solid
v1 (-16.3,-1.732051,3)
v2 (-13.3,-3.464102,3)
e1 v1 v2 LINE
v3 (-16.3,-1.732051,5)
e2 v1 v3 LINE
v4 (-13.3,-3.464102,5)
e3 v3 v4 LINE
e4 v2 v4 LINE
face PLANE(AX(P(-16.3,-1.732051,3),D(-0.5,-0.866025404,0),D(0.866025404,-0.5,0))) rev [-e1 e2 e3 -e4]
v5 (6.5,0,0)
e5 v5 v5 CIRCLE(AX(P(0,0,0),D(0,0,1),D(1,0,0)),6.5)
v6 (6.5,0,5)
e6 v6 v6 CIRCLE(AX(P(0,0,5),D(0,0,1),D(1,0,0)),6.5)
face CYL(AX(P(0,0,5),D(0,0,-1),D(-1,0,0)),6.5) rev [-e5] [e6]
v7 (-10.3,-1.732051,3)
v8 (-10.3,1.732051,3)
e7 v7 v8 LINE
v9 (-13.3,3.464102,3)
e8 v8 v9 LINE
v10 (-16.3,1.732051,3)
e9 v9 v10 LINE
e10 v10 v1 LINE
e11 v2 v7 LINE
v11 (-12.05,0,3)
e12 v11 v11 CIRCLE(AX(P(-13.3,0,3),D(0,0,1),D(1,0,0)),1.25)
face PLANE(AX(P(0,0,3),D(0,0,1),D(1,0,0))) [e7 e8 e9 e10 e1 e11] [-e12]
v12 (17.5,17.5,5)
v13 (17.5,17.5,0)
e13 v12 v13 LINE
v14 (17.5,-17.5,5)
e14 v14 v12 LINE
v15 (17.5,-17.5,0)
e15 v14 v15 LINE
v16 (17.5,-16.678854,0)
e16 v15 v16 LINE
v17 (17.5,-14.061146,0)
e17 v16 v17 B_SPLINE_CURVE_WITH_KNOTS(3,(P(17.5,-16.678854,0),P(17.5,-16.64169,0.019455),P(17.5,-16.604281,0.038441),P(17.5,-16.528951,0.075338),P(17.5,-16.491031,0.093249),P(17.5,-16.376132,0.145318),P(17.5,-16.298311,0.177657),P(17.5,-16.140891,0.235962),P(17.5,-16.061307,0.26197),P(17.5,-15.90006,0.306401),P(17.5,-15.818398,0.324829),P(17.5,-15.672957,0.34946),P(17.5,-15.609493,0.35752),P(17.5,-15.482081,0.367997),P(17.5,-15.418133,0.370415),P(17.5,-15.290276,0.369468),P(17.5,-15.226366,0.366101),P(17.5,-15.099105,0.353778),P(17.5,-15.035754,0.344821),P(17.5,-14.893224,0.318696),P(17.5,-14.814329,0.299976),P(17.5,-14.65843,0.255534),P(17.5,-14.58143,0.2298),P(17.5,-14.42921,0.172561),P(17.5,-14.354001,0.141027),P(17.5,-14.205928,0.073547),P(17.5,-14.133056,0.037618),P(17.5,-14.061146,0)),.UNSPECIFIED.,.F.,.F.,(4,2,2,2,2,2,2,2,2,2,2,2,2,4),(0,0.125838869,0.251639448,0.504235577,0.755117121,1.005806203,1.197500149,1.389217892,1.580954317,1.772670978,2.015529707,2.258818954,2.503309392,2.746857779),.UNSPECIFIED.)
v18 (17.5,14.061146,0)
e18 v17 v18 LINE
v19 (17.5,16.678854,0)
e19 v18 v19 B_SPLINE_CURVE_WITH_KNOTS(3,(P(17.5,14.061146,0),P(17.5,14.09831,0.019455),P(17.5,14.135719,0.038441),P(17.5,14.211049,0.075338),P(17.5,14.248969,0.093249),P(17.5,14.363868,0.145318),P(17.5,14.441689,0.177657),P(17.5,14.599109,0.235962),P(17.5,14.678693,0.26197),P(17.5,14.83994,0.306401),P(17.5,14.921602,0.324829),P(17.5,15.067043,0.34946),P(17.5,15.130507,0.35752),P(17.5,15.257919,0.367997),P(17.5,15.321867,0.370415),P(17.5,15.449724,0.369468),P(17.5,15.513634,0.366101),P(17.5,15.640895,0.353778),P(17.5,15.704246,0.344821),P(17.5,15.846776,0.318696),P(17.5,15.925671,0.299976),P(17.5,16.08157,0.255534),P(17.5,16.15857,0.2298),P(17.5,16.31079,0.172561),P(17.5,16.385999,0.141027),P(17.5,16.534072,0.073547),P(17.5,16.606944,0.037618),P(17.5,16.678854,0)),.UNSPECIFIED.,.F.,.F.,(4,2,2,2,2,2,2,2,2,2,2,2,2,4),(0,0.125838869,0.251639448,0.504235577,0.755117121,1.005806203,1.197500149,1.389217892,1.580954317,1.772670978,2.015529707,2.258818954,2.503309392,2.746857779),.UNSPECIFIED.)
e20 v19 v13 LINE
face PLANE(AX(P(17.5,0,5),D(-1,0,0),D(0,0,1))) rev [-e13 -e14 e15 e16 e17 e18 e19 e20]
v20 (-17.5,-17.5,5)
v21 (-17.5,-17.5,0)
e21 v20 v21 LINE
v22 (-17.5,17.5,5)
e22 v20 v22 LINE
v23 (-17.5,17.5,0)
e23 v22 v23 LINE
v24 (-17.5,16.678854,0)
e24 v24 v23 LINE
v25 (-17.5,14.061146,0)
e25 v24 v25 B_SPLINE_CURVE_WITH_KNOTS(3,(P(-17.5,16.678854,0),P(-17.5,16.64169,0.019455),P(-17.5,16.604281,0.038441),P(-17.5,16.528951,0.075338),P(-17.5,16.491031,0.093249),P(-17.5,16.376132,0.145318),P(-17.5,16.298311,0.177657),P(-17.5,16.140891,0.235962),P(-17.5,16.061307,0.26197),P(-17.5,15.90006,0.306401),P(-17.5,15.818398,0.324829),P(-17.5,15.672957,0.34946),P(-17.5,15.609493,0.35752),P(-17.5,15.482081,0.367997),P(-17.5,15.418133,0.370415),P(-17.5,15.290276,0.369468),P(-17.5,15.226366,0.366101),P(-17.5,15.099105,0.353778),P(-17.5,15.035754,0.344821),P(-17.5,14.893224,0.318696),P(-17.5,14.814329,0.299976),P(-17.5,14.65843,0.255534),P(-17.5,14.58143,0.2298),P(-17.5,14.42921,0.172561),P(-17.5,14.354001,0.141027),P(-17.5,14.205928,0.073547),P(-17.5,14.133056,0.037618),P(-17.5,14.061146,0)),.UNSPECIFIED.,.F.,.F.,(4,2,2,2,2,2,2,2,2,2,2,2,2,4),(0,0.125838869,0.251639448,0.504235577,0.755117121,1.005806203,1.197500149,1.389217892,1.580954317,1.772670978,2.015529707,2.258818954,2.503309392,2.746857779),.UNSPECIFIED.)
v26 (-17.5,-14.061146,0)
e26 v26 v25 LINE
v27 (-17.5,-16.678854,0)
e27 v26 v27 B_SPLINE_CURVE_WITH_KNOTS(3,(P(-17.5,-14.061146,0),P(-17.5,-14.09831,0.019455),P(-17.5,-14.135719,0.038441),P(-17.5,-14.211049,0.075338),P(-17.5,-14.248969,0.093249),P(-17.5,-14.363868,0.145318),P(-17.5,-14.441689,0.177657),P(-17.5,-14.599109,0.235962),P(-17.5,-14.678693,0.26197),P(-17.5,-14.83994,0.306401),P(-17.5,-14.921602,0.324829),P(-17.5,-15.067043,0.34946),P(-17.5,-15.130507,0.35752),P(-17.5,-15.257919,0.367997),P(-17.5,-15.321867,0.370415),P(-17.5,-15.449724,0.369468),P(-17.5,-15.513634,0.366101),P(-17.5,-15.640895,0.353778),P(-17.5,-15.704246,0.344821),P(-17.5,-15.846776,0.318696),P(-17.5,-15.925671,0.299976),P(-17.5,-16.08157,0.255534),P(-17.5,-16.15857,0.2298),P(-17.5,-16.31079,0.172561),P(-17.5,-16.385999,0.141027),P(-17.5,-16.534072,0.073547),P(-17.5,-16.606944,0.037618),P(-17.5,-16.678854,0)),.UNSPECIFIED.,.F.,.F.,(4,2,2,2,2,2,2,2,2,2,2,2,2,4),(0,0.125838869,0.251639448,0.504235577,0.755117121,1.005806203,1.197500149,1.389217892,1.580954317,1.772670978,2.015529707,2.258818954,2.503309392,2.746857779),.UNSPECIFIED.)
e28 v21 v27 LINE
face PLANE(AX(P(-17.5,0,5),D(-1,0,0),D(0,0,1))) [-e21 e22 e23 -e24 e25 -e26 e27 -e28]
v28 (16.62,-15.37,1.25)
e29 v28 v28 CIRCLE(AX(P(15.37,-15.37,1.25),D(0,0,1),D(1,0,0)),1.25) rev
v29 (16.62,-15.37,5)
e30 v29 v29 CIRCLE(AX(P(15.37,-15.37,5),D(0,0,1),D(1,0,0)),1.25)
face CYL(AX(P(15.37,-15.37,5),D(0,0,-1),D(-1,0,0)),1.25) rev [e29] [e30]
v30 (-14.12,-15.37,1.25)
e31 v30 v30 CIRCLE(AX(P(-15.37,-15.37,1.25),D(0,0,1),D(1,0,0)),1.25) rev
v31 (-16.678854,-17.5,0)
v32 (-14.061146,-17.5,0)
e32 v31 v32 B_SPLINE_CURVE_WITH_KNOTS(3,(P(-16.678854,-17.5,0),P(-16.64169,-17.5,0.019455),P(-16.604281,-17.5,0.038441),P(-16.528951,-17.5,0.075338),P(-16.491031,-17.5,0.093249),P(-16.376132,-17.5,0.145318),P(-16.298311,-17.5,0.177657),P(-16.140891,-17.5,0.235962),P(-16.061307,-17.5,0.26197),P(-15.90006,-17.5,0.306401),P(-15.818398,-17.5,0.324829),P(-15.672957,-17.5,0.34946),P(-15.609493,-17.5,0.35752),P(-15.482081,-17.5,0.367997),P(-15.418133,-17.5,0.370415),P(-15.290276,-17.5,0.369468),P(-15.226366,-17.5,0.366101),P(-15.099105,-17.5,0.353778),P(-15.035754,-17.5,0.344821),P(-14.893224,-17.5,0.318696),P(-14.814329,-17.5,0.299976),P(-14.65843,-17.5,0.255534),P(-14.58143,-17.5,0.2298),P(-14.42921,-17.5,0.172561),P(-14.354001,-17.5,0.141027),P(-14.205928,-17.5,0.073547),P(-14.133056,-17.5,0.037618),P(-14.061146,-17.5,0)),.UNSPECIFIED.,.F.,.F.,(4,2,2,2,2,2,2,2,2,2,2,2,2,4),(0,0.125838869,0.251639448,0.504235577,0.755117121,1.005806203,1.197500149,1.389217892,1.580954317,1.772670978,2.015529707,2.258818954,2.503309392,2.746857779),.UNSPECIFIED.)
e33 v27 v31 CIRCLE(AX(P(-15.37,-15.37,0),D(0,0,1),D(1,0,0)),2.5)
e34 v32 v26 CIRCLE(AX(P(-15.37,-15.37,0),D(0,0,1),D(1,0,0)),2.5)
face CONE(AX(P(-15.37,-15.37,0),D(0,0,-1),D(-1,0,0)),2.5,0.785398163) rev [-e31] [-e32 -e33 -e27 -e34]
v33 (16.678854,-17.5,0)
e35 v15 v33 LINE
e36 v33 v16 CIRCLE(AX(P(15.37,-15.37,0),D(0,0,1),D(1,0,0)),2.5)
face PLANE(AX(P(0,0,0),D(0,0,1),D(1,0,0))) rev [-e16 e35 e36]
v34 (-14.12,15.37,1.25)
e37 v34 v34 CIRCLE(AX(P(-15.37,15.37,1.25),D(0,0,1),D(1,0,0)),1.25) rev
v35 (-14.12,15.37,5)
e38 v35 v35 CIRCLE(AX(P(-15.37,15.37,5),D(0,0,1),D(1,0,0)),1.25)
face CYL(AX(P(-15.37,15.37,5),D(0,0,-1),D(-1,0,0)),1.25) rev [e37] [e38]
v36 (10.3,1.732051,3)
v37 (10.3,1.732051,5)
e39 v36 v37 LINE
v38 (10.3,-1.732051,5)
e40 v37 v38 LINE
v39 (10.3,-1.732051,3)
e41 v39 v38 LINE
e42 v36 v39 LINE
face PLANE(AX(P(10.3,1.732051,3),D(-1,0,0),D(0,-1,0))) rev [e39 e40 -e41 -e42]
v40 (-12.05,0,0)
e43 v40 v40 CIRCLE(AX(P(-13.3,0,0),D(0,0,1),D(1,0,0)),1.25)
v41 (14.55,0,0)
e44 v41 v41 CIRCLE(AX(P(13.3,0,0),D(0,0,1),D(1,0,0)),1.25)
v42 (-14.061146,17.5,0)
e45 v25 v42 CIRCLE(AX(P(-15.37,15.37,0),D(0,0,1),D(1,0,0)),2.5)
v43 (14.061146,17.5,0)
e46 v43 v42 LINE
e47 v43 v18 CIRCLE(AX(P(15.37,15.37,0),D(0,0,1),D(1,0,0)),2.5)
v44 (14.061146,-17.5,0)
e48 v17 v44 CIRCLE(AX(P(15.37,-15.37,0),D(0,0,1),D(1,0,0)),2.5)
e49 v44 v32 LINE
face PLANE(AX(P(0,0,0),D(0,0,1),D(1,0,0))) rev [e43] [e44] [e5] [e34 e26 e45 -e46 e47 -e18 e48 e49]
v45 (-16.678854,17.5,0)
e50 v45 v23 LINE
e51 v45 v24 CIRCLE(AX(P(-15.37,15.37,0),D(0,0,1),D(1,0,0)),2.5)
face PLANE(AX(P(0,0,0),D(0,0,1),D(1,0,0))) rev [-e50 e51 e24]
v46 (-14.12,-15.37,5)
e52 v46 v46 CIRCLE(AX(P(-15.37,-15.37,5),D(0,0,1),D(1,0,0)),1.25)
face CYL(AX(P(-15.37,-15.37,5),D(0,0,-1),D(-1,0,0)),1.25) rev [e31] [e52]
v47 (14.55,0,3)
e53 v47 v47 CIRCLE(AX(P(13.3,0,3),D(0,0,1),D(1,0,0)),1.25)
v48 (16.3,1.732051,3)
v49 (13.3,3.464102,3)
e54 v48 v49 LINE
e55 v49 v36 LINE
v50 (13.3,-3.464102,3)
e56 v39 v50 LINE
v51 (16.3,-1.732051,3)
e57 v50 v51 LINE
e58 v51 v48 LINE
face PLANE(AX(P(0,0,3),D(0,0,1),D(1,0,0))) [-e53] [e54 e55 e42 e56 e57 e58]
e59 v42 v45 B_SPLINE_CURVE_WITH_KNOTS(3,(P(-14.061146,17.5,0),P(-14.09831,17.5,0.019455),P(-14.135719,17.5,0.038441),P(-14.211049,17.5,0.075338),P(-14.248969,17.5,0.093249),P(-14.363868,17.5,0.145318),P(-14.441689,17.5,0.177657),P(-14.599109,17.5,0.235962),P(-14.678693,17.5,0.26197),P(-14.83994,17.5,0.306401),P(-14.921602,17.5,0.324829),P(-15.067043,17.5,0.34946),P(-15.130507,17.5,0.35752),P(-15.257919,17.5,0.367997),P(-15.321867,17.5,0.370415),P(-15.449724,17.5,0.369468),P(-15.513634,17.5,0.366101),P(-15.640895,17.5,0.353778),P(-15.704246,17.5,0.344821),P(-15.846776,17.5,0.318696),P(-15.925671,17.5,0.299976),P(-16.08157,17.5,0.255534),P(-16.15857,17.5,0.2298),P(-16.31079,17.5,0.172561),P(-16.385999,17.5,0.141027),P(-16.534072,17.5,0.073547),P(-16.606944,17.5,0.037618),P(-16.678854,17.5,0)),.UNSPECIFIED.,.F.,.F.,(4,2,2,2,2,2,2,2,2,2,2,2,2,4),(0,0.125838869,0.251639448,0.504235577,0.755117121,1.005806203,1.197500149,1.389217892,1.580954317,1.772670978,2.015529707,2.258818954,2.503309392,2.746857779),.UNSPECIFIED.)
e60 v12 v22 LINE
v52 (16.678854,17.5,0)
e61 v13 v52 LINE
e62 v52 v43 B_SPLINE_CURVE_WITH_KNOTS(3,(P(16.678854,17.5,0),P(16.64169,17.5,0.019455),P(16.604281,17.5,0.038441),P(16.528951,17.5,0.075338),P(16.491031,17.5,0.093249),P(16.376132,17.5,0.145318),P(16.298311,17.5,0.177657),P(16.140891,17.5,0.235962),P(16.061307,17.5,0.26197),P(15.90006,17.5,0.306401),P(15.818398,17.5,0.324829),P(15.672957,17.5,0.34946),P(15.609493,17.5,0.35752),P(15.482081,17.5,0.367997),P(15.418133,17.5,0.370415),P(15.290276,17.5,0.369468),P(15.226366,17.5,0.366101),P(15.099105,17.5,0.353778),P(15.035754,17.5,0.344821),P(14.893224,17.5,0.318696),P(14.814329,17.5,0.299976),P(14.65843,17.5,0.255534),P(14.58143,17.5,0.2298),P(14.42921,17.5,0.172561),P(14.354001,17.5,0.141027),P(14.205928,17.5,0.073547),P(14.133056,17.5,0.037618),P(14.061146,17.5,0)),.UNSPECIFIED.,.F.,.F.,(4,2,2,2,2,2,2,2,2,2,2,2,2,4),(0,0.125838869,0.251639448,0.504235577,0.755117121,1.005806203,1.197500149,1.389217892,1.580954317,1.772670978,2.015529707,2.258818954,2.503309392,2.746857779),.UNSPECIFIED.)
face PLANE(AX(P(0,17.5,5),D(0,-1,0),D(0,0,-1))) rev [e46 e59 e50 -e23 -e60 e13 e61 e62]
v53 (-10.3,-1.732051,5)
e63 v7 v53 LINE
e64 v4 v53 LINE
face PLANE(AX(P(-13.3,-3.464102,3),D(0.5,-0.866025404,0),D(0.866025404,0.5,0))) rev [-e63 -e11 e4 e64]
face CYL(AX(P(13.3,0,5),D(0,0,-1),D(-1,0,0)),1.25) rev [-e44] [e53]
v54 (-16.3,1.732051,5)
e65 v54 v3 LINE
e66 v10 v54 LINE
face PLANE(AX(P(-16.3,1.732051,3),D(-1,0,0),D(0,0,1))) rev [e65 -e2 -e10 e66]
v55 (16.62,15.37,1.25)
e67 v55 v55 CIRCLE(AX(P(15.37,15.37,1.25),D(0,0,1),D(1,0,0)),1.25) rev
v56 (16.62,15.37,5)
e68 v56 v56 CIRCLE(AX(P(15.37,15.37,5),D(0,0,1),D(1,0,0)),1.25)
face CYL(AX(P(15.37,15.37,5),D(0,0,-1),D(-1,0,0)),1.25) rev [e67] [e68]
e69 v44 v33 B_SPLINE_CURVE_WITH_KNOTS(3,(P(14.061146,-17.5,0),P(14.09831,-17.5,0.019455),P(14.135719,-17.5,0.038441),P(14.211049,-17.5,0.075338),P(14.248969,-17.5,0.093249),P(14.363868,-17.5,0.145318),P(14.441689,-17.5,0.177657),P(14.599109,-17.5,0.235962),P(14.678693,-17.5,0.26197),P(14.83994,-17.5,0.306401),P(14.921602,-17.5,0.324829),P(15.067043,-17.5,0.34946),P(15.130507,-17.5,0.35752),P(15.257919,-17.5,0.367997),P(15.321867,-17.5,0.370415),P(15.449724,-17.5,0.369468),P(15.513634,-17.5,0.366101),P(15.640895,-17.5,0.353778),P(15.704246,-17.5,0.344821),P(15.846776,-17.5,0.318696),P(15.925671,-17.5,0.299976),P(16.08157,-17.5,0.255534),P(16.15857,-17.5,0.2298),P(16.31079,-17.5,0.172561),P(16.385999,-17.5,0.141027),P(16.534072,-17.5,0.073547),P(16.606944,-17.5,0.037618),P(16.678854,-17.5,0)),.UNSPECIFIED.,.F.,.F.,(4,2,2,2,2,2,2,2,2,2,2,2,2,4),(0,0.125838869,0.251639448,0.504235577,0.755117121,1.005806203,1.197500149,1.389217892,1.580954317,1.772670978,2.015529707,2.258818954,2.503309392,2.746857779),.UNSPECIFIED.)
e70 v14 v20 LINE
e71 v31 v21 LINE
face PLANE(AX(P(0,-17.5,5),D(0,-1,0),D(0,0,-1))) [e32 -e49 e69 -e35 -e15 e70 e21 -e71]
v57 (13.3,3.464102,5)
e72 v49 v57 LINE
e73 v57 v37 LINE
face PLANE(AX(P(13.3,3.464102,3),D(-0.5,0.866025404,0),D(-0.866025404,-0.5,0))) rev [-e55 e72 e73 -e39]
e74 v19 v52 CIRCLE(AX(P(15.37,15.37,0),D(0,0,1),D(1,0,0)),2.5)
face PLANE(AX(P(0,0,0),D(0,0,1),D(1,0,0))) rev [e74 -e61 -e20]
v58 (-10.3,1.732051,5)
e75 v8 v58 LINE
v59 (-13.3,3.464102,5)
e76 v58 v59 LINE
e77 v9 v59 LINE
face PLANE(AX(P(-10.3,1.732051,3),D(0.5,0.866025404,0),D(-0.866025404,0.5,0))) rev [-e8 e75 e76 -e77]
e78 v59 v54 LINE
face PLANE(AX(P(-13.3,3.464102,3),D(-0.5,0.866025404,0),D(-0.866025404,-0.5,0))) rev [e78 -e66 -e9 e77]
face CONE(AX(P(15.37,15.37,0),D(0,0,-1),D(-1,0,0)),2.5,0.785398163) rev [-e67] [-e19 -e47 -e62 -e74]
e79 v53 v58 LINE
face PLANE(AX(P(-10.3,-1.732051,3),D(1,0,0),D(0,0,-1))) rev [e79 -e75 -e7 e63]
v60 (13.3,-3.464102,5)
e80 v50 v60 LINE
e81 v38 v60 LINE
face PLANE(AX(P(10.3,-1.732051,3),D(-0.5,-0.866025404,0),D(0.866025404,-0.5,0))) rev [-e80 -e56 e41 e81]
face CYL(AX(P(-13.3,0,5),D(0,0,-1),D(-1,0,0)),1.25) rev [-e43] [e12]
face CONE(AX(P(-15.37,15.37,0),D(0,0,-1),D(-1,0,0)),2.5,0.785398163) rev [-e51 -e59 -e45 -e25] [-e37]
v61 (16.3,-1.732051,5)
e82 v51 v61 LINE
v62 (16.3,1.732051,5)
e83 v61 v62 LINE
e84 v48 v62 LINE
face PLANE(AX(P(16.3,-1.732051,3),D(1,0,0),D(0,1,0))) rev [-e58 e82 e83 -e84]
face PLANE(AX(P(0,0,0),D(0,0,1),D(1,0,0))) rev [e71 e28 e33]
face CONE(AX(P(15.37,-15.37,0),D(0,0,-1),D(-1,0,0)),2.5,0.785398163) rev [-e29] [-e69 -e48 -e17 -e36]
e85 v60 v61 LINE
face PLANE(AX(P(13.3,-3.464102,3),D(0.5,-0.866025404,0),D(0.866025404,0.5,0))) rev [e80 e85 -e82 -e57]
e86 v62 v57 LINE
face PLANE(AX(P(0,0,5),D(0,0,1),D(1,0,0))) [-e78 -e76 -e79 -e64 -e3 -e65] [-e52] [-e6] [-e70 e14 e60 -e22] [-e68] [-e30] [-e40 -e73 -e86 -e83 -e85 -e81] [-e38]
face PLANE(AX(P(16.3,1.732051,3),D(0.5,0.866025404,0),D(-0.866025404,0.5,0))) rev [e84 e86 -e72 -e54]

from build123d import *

# Parameters (mm, degrees)
CROQUIS1_W              = 35
CROQUIS1_H              = 35
CROQUIS1_R              = 1.25
CROQUIS1_R_2            = 6.5
SALIENTE_EXTRUIR1_DEPTH = 5
CORTAR_EXTRUIR1_DEPTH   = 2
CHAFL_N1_SIZE           = 1.25


with BuildPart() as part:
    # Croquis1 → Saliente-Extruir1 (new body)
    with BuildSketch(Plane.XY):
        Rectangle(CROQUIS1_W, CROQUIS1_H)
        with Locations((-15.37, 15.37)):
            Circle(CROQUIS1_R, mode=Mode.SUBTRACT)
        with Locations((15.37, 15.37)):
            Circle(CROQUIS1_R, mode=Mode.SUBTRACT)
        with Locations((15.37, -15.37)):
            Circle(CROQUIS1_R, mode=Mode.SUBTRACT)
        with Locations((-15.37, -15.37)):
            Circle(CROQUIS1_R, mode=Mode.SUBTRACT)
        Circle(CROQUIS1_R_2, mode=Mode.SUBTRACT)
        with Locations((13.3, 0)):
            Circle(CROQUIS1_R, mode=Mode.SUBTRACT)
        with Locations((-13.3, 0)):
            Circle(CROQUIS1_R, mode=Mode.SUBTRACT)
    extrude(amount=SALIENTE_EXTRUIR1_DEPTH)

    # Croquis2 → Cortar-Extruir1 (cut)
    with BuildSketch(Plane.XY.offset(5)):
        Polygon((-13.3, 3.464101615), (-16.3, 1.732050808), (-16.3, -1.732050808), (-13.3, -3.464101615), (-10.3, -1.732050808), (-10.3, 1.732050808), align=None)
        Polygon((13.3, 3.464101615), (10.3, 1.732050808), (10.3, -1.732050808), (13.3, -3.464101615), (16.3, -1.732050808), (16.3, 1.732050808), align=None)
    extrude(amount=-CORTAR_EXTRUIR1_DEPTH, mode=Mode.SUBTRACT)

    # Chaflán1
    # the kernel refuses this chamfer: 1.25 mm, written as the material it takes off along each edge
    with BuildSketch(Plane(origin=(-15.37, 15.37, 0), x_dir=(1, 0, 0), z_dir=(0, -1, 0))) as chafl_n1_piece_1:
        Polygon((1.25 + CHAFL_N1_SIZE, 0), (1.25, CHAFL_N1_SIZE), (1.25, 0), align=None)
    revolve(axis=Axis((-15.37, 15.37, 0), (0, 0, 1)), mode=Mode.SUBTRACT)
    with BuildSketch(Plane(origin=(15.37, 15.37, 0), x_dir=(1, 0, 0), z_dir=(0, -1, 0))) as chafl_n1_piece_2:
        Polygon((1.25 + CHAFL_N1_SIZE, 0), (1.25, CHAFL_N1_SIZE), (1.25, 0), align=None)
    revolve(axis=Axis((15.37, 15.37, 0), (0, 0, 1)), mode=Mode.SUBTRACT)
    with BuildSketch(Plane(origin=(15.37, -15.37, 0), x_dir=(1, 0, 0), z_dir=(0, -1, 0))) as chafl_n1_piece_3:
        Polygon((1.25 + CHAFL_N1_SIZE, 0), (1.25, CHAFL_N1_SIZE), (1.25, 0), align=None)
    revolve(axis=Axis((15.37, -15.37, 0), (0, 0, 1)), mode=Mode.SUBTRACT)
    with BuildSketch(Plane(origin=(-15.37, -15.37, 0), x_dir=(1, 0, 0), z_dir=(0, -1, 0))) as chafl_n1_piece_4:
        Polygon((1.25 + CHAFL_N1_SIZE, 0), (1.25, CHAFL_N1_SIZE), (1.25, 0), align=None)
    revolve(axis=Axis((-15.37, -15.37, 0), (0, 0, 1)), mode=Mode.SUBTRACT)


solid = part.part
